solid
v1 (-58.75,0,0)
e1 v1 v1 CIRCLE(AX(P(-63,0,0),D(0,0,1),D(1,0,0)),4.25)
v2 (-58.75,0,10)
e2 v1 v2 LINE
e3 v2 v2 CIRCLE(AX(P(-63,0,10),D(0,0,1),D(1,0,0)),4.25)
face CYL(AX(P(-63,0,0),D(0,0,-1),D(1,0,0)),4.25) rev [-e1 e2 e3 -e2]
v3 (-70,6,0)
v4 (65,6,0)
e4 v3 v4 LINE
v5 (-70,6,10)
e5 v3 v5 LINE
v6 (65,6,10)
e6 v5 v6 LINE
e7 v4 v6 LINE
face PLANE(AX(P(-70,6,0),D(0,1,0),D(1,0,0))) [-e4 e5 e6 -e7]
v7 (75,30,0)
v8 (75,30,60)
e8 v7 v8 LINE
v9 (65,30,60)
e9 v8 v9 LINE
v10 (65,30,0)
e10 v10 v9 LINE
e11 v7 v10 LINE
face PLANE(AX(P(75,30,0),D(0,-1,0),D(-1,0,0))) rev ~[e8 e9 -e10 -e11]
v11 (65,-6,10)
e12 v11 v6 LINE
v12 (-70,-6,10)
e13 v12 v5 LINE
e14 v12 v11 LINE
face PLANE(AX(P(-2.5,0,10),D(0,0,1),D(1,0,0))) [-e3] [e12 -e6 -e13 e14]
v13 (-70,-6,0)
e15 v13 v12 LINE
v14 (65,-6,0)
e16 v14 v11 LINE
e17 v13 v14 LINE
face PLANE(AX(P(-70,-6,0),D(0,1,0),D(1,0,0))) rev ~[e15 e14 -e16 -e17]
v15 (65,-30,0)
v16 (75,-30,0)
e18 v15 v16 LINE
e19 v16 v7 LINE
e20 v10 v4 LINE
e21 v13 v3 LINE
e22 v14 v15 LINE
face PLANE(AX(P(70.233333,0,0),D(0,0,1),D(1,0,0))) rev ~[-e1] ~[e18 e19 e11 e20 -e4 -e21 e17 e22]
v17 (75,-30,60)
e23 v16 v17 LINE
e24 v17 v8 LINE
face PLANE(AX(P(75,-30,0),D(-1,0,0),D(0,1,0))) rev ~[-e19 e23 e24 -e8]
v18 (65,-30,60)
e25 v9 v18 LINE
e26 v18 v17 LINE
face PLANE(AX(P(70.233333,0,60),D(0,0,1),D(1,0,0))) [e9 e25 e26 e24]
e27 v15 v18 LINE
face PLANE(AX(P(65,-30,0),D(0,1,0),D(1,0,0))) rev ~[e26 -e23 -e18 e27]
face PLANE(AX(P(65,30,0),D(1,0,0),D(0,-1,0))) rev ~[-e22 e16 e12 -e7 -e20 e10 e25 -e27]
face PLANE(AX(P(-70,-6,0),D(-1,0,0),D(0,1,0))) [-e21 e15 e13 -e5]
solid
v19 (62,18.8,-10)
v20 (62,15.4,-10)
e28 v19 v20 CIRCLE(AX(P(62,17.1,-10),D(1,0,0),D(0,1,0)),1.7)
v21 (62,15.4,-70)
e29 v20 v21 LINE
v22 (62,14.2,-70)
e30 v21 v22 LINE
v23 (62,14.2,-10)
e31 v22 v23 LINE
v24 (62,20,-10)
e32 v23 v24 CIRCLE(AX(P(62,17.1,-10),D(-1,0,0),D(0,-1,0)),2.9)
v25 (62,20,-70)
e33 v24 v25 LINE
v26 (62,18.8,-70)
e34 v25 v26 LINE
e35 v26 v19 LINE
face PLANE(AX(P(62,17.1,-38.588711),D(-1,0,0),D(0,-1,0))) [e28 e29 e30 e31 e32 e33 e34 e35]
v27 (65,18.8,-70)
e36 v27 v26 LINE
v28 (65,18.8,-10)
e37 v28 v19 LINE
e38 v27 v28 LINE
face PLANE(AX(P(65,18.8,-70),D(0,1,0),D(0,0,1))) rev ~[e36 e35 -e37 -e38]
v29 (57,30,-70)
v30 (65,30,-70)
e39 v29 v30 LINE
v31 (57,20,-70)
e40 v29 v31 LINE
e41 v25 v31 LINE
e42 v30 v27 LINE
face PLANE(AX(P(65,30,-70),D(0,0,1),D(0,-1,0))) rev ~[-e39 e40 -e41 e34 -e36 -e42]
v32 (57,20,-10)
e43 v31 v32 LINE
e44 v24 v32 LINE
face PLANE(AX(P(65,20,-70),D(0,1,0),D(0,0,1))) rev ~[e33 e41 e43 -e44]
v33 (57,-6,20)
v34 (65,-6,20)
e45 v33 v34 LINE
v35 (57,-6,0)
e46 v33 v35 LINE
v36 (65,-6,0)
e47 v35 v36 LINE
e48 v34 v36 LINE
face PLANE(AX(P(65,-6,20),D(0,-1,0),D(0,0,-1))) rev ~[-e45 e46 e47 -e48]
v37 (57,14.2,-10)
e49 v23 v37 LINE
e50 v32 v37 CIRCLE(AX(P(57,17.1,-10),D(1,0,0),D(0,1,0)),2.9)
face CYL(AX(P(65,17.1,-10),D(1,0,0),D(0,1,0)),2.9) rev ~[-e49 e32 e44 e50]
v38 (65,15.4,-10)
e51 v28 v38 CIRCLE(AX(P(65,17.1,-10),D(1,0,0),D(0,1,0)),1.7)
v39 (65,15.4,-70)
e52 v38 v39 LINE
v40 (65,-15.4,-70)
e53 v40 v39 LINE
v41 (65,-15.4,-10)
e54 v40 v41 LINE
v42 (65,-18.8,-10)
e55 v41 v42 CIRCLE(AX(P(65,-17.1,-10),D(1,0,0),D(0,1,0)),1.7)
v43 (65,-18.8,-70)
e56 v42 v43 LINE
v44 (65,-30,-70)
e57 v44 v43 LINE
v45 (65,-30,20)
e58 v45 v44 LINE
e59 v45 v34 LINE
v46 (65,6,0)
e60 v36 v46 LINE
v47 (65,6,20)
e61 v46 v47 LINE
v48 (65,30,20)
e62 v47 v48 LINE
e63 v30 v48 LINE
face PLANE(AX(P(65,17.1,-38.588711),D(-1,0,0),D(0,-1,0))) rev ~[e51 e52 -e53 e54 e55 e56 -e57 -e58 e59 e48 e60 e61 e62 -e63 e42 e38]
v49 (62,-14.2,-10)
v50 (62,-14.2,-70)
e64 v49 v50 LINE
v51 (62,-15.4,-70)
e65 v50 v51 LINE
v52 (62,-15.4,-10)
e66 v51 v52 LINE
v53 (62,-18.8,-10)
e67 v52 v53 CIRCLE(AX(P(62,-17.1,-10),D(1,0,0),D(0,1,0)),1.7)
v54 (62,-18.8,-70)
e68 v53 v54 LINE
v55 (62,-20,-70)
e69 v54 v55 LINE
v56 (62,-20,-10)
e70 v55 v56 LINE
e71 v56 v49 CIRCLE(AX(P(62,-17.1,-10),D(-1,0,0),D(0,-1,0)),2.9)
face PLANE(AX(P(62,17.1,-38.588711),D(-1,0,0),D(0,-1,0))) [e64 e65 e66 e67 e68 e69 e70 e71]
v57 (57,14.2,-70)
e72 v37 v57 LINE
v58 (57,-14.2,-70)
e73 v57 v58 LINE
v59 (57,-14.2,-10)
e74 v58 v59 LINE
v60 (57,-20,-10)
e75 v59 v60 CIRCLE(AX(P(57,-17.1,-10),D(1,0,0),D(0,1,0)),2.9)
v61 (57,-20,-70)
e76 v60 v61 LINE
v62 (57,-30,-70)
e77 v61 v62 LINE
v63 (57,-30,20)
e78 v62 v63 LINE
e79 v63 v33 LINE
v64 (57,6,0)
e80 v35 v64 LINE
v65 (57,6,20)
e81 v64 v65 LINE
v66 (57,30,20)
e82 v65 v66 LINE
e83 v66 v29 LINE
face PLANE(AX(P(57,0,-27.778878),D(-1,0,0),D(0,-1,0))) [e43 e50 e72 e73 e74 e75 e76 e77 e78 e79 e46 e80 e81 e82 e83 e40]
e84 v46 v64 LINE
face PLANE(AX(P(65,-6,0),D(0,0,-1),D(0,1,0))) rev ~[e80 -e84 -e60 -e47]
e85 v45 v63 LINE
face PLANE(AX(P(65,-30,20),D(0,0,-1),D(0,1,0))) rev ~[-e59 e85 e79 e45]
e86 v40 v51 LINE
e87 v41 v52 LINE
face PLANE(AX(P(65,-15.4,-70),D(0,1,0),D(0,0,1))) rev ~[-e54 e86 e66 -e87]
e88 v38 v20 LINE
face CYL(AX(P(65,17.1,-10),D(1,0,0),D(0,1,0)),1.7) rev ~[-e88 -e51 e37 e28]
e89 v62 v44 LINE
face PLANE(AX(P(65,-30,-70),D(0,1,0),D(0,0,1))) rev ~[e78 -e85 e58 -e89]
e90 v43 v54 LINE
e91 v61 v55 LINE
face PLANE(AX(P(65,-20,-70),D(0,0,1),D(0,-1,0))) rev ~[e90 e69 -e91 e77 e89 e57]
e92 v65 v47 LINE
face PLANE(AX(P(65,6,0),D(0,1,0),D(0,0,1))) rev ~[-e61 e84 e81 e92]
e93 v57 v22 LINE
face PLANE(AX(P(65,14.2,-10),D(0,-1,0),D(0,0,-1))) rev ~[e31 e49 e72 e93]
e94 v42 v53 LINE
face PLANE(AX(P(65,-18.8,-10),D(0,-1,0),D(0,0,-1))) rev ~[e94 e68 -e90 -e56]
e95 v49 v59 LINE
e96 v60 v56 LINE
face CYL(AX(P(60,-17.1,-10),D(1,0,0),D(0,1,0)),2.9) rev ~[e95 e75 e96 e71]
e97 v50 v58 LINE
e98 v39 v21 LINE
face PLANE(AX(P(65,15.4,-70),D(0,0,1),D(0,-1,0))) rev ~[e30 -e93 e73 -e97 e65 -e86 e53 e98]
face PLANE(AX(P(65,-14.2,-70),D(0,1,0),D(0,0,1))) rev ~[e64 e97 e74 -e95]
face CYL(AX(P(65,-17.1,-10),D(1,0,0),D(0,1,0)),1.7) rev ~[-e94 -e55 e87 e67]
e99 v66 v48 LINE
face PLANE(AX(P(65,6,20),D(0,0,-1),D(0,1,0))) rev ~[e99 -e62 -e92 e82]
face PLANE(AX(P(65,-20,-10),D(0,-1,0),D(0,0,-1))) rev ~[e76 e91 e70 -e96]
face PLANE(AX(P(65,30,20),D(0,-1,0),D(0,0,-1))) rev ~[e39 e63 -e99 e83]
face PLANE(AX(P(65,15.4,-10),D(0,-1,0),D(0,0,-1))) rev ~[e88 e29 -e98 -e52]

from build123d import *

# Parameters (mm, degrees)
F0_W     = 135
F0_H     = 12
F0_R     = 4.25
F1_DEPTH = 10
F0_W_2   = 5
F2_DEPTH = 60
F4_DEPTH = 5
F5_DEPTH = 3


with BuildPart() as f1:
    # F0 (on Top) → F1 (new body)
    with BuildSketch(Plane.XY):
        with Locations((-2.5, 0)):
            Rectangle(F0_W, F0_H)
        with Locations((-63, 0)):
            Circle(F0_R, mode=Mode.SUBTRACT)
    extrude(amount=F1_DEPTH)

    # F0 (on Top) → F2 (join)
    with BuildSketch(Plane.XY):
        Polygon((65, 30), (65, 6), (70, 6), (70, -6), (65, -6), (65, -30), (75, -30), (75, 30), align=None)
        with Locations((67.5, 0)):
            Rectangle(F0_W_2, F0_H)
    extrude(amount=F2_DEPTH)


with BuildPart() as f4:
    # F3 (on face) → F4 (new body)
    with BuildSketch(Plane(origin=(65, 0, 0), x_dir=(0, -1, 0), z_dir=(-1, 0, 0))):
        with BuildLine():
            Line((-6, 0), (-30, 0))
            Line((-30, 0), (-30, -70))
            Line((-30, -70), (-20, -70))
            Line((-20, -70), (-20, -10))
            ThreePointArc((-20, -10), (-17.1, -7.1), (-14.2, -10))
            Line((-14.2, -10), (-14.2, -70))
            Line((-14.2, -70), (14.2, -70))
            Line((14.2, -70), (14.2, -10))
            ThreePointArc((14.2, -10), (17.1, -7.1), (20, -10))
            Line((20, -10), (20, -70))
            Line((20, -70), (30, -70))
            Line((30, -70), (30, 0))
            Line((30, 0), (6, 0))
            Line((6, 0), (-6, 0))
        make_face()
        Polygon((-30, 20), (-30, 0), (-6, 0), (-6, 10), (-6, 20), align=None)
        Polygon((6, 10), (6, 0), (30, 0), (30, 20), (6, 20), align=None)
    extrude(amount=F4_DEPTH)

    # F3 (on face) + F4_face (on face) + F4_face1 (on face) → F5 (join)
    with BuildSketch(Plane(origin=(65, 0, 0), x_dir=(0, -1, 0), z_dir=(-1, 0, 0))):
        with BuildLine():
            Line((-20, -10), (-20, -70))
            Line((-20, -70), (-18.8, -70))
            Line((-18.8, -70), (-18.8, -10))
            ThreePointArc((-18.8, -10), (-17.1, -8.3), (-15.4, -10))
            Line((-15.4, -10), (-15.4, -70))
            Line((-15.4, -70), (-14.2, -70))
            Line((-14.2, -70), (-14.2, -10))
            ThreePointArc((-14.2, -10), (-17.1, -7.1), (-20, -10))
        make_face()
        with BuildLine():
            Line((18.8, -70), (20, -70))
            Line((20, -70), (20, -10))
            ThreePointArc((20, -10), (17.1, -7.1), (14.2, -10))
            Line((14.2, -10), (14.2, -70))
            Line((14.2, -70), (15.4, -70))
            Line((15.4, -70), (15.4, -10))
            ThreePointArc((15.4, -10), (17.1, -8.3), (18.8, -10))
            Line((18.8, -10), (18.8, -70))
        make_face()
        with BuildLine():
            Line((-6, 0), (-30, 0))
            Line((-30, 0), (-30, -70))
            Line((-30, -70), (-20, -70))
            Line((-20, -70), (-20, -10))
            ThreePointArc((-20, -10), (-17.1, -7.1), (-14.2, -10))
            Line((-14.2, -10), (-14.2, -70))
            Line((-14.2, -70), (14.2, -70))
            Line((14.2, -70), (14.2, -10))
            ThreePointArc((14.2, -10), (17.1, -7.1), (20, -10))
            Line((20, -10), (20, -70))
            Line((20, -70), (30, -70))
            Line((30, -70), (30, 0))
            Line((30, 0), (6, 0))
            Line((6, 0), (-6, 0))
        make_face()
    with BuildSketch(Plane(origin=(60, 0, -24.6369260479), x_dir=(0, -1, 0), z_dir=(-1, 0, 0))):
        with BuildLine():
            Line((20, 14.6369260479), (20, -45.3630739521))
            Line((20, -45.3630739521), (30, -45.3630739521))
            Line((30, -45.3630739521), (30, 44.6369260479))
            Line((30, 44.6369260479), (6, 44.6369260479))
            Line((6, 44.6369260479), (6, 24.6369260479))
            Line((6, 24.6369260479), (-6, 24.6369260479))
            Line((-6, 24.6369260479), (-6, 44.6369260479))
            Line((-6, 44.6369260479), (-30, 44.6369260479))
            Line((-30, 44.6369260479), (-30, -45.3630739521))
            Line((-30, -45.3630739521), (-20, -45.3630739521))
            Line((-20, -45.3630739521), (-20, 14.6369260479))
            ThreePointArc((-20, 14.6369260479), (-17.1, 17.5369260479), (-14.2, 14.6369260479))
            Line((-14.2, 14.6369260479), (-14.2, -45.3630739521))
            Line((-14.2, -45.3630739521), (14.2, -45.3630739521))
            Line((14.2, -45.3630739521), (14.2, 14.6369260479))
            ThreePointArc((14.2, 14.6369260479), (17.1, 17.5369260479), (20, 14.6369260479))
        make_face()
    with BuildSketch(Plane(origin=(65, 0, -24.6369260479), x_dir=(0, -1, 0), z_dir=(1, 0, 0))):
        with BuildLine():
            Line((20, 45.3630739521), (20, -14.6369260479))
            ThreePointArc((20, -14.6369260479), (17.1, -17.5369260479), (14.2, -14.6369260479))
            Line((14.2, -14.6369260479), (14.2, 45.3630739521))
            Line((14.2, 45.3630739521), (-14.2, 45.3630739521))
            Line((-14.2, 45.3630739521), (-14.2, -14.6369260479))
            ThreePointArc((-14.2, -14.6369260479), (-17.1, -17.5369260479), (-20, -14.6369260479))
            Line((-20, -14.6369260479), (-20, 45.3630739521))
            Line((-20, 45.3630739521), (-30, 45.3630739521))
            Line((-30, 45.3630739521), (-30, -44.6369260479))
            Line((-30, -44.6369260479), (-6, -44.6369260479))
            Line((-6, -44.6369260479), (-6, -24.6369260479))
            Line((-6, -24.6369260479), (6, -24.6369260479))
            Line((6, -24.6369260479), (6, -44.6369260479))
            Line((6, -44.6369260479), (30, -44.6369260479))
            Line((30, -44.6369260479), (30, 45.3630739521))
            Line((30, 45.3630739521), (20, 45.3630739521))
        make_face()
    extrude(amount=F5_DEPTH, dir=(-1, 0, 0))


solid = Compound([f1.part, f4.part])
